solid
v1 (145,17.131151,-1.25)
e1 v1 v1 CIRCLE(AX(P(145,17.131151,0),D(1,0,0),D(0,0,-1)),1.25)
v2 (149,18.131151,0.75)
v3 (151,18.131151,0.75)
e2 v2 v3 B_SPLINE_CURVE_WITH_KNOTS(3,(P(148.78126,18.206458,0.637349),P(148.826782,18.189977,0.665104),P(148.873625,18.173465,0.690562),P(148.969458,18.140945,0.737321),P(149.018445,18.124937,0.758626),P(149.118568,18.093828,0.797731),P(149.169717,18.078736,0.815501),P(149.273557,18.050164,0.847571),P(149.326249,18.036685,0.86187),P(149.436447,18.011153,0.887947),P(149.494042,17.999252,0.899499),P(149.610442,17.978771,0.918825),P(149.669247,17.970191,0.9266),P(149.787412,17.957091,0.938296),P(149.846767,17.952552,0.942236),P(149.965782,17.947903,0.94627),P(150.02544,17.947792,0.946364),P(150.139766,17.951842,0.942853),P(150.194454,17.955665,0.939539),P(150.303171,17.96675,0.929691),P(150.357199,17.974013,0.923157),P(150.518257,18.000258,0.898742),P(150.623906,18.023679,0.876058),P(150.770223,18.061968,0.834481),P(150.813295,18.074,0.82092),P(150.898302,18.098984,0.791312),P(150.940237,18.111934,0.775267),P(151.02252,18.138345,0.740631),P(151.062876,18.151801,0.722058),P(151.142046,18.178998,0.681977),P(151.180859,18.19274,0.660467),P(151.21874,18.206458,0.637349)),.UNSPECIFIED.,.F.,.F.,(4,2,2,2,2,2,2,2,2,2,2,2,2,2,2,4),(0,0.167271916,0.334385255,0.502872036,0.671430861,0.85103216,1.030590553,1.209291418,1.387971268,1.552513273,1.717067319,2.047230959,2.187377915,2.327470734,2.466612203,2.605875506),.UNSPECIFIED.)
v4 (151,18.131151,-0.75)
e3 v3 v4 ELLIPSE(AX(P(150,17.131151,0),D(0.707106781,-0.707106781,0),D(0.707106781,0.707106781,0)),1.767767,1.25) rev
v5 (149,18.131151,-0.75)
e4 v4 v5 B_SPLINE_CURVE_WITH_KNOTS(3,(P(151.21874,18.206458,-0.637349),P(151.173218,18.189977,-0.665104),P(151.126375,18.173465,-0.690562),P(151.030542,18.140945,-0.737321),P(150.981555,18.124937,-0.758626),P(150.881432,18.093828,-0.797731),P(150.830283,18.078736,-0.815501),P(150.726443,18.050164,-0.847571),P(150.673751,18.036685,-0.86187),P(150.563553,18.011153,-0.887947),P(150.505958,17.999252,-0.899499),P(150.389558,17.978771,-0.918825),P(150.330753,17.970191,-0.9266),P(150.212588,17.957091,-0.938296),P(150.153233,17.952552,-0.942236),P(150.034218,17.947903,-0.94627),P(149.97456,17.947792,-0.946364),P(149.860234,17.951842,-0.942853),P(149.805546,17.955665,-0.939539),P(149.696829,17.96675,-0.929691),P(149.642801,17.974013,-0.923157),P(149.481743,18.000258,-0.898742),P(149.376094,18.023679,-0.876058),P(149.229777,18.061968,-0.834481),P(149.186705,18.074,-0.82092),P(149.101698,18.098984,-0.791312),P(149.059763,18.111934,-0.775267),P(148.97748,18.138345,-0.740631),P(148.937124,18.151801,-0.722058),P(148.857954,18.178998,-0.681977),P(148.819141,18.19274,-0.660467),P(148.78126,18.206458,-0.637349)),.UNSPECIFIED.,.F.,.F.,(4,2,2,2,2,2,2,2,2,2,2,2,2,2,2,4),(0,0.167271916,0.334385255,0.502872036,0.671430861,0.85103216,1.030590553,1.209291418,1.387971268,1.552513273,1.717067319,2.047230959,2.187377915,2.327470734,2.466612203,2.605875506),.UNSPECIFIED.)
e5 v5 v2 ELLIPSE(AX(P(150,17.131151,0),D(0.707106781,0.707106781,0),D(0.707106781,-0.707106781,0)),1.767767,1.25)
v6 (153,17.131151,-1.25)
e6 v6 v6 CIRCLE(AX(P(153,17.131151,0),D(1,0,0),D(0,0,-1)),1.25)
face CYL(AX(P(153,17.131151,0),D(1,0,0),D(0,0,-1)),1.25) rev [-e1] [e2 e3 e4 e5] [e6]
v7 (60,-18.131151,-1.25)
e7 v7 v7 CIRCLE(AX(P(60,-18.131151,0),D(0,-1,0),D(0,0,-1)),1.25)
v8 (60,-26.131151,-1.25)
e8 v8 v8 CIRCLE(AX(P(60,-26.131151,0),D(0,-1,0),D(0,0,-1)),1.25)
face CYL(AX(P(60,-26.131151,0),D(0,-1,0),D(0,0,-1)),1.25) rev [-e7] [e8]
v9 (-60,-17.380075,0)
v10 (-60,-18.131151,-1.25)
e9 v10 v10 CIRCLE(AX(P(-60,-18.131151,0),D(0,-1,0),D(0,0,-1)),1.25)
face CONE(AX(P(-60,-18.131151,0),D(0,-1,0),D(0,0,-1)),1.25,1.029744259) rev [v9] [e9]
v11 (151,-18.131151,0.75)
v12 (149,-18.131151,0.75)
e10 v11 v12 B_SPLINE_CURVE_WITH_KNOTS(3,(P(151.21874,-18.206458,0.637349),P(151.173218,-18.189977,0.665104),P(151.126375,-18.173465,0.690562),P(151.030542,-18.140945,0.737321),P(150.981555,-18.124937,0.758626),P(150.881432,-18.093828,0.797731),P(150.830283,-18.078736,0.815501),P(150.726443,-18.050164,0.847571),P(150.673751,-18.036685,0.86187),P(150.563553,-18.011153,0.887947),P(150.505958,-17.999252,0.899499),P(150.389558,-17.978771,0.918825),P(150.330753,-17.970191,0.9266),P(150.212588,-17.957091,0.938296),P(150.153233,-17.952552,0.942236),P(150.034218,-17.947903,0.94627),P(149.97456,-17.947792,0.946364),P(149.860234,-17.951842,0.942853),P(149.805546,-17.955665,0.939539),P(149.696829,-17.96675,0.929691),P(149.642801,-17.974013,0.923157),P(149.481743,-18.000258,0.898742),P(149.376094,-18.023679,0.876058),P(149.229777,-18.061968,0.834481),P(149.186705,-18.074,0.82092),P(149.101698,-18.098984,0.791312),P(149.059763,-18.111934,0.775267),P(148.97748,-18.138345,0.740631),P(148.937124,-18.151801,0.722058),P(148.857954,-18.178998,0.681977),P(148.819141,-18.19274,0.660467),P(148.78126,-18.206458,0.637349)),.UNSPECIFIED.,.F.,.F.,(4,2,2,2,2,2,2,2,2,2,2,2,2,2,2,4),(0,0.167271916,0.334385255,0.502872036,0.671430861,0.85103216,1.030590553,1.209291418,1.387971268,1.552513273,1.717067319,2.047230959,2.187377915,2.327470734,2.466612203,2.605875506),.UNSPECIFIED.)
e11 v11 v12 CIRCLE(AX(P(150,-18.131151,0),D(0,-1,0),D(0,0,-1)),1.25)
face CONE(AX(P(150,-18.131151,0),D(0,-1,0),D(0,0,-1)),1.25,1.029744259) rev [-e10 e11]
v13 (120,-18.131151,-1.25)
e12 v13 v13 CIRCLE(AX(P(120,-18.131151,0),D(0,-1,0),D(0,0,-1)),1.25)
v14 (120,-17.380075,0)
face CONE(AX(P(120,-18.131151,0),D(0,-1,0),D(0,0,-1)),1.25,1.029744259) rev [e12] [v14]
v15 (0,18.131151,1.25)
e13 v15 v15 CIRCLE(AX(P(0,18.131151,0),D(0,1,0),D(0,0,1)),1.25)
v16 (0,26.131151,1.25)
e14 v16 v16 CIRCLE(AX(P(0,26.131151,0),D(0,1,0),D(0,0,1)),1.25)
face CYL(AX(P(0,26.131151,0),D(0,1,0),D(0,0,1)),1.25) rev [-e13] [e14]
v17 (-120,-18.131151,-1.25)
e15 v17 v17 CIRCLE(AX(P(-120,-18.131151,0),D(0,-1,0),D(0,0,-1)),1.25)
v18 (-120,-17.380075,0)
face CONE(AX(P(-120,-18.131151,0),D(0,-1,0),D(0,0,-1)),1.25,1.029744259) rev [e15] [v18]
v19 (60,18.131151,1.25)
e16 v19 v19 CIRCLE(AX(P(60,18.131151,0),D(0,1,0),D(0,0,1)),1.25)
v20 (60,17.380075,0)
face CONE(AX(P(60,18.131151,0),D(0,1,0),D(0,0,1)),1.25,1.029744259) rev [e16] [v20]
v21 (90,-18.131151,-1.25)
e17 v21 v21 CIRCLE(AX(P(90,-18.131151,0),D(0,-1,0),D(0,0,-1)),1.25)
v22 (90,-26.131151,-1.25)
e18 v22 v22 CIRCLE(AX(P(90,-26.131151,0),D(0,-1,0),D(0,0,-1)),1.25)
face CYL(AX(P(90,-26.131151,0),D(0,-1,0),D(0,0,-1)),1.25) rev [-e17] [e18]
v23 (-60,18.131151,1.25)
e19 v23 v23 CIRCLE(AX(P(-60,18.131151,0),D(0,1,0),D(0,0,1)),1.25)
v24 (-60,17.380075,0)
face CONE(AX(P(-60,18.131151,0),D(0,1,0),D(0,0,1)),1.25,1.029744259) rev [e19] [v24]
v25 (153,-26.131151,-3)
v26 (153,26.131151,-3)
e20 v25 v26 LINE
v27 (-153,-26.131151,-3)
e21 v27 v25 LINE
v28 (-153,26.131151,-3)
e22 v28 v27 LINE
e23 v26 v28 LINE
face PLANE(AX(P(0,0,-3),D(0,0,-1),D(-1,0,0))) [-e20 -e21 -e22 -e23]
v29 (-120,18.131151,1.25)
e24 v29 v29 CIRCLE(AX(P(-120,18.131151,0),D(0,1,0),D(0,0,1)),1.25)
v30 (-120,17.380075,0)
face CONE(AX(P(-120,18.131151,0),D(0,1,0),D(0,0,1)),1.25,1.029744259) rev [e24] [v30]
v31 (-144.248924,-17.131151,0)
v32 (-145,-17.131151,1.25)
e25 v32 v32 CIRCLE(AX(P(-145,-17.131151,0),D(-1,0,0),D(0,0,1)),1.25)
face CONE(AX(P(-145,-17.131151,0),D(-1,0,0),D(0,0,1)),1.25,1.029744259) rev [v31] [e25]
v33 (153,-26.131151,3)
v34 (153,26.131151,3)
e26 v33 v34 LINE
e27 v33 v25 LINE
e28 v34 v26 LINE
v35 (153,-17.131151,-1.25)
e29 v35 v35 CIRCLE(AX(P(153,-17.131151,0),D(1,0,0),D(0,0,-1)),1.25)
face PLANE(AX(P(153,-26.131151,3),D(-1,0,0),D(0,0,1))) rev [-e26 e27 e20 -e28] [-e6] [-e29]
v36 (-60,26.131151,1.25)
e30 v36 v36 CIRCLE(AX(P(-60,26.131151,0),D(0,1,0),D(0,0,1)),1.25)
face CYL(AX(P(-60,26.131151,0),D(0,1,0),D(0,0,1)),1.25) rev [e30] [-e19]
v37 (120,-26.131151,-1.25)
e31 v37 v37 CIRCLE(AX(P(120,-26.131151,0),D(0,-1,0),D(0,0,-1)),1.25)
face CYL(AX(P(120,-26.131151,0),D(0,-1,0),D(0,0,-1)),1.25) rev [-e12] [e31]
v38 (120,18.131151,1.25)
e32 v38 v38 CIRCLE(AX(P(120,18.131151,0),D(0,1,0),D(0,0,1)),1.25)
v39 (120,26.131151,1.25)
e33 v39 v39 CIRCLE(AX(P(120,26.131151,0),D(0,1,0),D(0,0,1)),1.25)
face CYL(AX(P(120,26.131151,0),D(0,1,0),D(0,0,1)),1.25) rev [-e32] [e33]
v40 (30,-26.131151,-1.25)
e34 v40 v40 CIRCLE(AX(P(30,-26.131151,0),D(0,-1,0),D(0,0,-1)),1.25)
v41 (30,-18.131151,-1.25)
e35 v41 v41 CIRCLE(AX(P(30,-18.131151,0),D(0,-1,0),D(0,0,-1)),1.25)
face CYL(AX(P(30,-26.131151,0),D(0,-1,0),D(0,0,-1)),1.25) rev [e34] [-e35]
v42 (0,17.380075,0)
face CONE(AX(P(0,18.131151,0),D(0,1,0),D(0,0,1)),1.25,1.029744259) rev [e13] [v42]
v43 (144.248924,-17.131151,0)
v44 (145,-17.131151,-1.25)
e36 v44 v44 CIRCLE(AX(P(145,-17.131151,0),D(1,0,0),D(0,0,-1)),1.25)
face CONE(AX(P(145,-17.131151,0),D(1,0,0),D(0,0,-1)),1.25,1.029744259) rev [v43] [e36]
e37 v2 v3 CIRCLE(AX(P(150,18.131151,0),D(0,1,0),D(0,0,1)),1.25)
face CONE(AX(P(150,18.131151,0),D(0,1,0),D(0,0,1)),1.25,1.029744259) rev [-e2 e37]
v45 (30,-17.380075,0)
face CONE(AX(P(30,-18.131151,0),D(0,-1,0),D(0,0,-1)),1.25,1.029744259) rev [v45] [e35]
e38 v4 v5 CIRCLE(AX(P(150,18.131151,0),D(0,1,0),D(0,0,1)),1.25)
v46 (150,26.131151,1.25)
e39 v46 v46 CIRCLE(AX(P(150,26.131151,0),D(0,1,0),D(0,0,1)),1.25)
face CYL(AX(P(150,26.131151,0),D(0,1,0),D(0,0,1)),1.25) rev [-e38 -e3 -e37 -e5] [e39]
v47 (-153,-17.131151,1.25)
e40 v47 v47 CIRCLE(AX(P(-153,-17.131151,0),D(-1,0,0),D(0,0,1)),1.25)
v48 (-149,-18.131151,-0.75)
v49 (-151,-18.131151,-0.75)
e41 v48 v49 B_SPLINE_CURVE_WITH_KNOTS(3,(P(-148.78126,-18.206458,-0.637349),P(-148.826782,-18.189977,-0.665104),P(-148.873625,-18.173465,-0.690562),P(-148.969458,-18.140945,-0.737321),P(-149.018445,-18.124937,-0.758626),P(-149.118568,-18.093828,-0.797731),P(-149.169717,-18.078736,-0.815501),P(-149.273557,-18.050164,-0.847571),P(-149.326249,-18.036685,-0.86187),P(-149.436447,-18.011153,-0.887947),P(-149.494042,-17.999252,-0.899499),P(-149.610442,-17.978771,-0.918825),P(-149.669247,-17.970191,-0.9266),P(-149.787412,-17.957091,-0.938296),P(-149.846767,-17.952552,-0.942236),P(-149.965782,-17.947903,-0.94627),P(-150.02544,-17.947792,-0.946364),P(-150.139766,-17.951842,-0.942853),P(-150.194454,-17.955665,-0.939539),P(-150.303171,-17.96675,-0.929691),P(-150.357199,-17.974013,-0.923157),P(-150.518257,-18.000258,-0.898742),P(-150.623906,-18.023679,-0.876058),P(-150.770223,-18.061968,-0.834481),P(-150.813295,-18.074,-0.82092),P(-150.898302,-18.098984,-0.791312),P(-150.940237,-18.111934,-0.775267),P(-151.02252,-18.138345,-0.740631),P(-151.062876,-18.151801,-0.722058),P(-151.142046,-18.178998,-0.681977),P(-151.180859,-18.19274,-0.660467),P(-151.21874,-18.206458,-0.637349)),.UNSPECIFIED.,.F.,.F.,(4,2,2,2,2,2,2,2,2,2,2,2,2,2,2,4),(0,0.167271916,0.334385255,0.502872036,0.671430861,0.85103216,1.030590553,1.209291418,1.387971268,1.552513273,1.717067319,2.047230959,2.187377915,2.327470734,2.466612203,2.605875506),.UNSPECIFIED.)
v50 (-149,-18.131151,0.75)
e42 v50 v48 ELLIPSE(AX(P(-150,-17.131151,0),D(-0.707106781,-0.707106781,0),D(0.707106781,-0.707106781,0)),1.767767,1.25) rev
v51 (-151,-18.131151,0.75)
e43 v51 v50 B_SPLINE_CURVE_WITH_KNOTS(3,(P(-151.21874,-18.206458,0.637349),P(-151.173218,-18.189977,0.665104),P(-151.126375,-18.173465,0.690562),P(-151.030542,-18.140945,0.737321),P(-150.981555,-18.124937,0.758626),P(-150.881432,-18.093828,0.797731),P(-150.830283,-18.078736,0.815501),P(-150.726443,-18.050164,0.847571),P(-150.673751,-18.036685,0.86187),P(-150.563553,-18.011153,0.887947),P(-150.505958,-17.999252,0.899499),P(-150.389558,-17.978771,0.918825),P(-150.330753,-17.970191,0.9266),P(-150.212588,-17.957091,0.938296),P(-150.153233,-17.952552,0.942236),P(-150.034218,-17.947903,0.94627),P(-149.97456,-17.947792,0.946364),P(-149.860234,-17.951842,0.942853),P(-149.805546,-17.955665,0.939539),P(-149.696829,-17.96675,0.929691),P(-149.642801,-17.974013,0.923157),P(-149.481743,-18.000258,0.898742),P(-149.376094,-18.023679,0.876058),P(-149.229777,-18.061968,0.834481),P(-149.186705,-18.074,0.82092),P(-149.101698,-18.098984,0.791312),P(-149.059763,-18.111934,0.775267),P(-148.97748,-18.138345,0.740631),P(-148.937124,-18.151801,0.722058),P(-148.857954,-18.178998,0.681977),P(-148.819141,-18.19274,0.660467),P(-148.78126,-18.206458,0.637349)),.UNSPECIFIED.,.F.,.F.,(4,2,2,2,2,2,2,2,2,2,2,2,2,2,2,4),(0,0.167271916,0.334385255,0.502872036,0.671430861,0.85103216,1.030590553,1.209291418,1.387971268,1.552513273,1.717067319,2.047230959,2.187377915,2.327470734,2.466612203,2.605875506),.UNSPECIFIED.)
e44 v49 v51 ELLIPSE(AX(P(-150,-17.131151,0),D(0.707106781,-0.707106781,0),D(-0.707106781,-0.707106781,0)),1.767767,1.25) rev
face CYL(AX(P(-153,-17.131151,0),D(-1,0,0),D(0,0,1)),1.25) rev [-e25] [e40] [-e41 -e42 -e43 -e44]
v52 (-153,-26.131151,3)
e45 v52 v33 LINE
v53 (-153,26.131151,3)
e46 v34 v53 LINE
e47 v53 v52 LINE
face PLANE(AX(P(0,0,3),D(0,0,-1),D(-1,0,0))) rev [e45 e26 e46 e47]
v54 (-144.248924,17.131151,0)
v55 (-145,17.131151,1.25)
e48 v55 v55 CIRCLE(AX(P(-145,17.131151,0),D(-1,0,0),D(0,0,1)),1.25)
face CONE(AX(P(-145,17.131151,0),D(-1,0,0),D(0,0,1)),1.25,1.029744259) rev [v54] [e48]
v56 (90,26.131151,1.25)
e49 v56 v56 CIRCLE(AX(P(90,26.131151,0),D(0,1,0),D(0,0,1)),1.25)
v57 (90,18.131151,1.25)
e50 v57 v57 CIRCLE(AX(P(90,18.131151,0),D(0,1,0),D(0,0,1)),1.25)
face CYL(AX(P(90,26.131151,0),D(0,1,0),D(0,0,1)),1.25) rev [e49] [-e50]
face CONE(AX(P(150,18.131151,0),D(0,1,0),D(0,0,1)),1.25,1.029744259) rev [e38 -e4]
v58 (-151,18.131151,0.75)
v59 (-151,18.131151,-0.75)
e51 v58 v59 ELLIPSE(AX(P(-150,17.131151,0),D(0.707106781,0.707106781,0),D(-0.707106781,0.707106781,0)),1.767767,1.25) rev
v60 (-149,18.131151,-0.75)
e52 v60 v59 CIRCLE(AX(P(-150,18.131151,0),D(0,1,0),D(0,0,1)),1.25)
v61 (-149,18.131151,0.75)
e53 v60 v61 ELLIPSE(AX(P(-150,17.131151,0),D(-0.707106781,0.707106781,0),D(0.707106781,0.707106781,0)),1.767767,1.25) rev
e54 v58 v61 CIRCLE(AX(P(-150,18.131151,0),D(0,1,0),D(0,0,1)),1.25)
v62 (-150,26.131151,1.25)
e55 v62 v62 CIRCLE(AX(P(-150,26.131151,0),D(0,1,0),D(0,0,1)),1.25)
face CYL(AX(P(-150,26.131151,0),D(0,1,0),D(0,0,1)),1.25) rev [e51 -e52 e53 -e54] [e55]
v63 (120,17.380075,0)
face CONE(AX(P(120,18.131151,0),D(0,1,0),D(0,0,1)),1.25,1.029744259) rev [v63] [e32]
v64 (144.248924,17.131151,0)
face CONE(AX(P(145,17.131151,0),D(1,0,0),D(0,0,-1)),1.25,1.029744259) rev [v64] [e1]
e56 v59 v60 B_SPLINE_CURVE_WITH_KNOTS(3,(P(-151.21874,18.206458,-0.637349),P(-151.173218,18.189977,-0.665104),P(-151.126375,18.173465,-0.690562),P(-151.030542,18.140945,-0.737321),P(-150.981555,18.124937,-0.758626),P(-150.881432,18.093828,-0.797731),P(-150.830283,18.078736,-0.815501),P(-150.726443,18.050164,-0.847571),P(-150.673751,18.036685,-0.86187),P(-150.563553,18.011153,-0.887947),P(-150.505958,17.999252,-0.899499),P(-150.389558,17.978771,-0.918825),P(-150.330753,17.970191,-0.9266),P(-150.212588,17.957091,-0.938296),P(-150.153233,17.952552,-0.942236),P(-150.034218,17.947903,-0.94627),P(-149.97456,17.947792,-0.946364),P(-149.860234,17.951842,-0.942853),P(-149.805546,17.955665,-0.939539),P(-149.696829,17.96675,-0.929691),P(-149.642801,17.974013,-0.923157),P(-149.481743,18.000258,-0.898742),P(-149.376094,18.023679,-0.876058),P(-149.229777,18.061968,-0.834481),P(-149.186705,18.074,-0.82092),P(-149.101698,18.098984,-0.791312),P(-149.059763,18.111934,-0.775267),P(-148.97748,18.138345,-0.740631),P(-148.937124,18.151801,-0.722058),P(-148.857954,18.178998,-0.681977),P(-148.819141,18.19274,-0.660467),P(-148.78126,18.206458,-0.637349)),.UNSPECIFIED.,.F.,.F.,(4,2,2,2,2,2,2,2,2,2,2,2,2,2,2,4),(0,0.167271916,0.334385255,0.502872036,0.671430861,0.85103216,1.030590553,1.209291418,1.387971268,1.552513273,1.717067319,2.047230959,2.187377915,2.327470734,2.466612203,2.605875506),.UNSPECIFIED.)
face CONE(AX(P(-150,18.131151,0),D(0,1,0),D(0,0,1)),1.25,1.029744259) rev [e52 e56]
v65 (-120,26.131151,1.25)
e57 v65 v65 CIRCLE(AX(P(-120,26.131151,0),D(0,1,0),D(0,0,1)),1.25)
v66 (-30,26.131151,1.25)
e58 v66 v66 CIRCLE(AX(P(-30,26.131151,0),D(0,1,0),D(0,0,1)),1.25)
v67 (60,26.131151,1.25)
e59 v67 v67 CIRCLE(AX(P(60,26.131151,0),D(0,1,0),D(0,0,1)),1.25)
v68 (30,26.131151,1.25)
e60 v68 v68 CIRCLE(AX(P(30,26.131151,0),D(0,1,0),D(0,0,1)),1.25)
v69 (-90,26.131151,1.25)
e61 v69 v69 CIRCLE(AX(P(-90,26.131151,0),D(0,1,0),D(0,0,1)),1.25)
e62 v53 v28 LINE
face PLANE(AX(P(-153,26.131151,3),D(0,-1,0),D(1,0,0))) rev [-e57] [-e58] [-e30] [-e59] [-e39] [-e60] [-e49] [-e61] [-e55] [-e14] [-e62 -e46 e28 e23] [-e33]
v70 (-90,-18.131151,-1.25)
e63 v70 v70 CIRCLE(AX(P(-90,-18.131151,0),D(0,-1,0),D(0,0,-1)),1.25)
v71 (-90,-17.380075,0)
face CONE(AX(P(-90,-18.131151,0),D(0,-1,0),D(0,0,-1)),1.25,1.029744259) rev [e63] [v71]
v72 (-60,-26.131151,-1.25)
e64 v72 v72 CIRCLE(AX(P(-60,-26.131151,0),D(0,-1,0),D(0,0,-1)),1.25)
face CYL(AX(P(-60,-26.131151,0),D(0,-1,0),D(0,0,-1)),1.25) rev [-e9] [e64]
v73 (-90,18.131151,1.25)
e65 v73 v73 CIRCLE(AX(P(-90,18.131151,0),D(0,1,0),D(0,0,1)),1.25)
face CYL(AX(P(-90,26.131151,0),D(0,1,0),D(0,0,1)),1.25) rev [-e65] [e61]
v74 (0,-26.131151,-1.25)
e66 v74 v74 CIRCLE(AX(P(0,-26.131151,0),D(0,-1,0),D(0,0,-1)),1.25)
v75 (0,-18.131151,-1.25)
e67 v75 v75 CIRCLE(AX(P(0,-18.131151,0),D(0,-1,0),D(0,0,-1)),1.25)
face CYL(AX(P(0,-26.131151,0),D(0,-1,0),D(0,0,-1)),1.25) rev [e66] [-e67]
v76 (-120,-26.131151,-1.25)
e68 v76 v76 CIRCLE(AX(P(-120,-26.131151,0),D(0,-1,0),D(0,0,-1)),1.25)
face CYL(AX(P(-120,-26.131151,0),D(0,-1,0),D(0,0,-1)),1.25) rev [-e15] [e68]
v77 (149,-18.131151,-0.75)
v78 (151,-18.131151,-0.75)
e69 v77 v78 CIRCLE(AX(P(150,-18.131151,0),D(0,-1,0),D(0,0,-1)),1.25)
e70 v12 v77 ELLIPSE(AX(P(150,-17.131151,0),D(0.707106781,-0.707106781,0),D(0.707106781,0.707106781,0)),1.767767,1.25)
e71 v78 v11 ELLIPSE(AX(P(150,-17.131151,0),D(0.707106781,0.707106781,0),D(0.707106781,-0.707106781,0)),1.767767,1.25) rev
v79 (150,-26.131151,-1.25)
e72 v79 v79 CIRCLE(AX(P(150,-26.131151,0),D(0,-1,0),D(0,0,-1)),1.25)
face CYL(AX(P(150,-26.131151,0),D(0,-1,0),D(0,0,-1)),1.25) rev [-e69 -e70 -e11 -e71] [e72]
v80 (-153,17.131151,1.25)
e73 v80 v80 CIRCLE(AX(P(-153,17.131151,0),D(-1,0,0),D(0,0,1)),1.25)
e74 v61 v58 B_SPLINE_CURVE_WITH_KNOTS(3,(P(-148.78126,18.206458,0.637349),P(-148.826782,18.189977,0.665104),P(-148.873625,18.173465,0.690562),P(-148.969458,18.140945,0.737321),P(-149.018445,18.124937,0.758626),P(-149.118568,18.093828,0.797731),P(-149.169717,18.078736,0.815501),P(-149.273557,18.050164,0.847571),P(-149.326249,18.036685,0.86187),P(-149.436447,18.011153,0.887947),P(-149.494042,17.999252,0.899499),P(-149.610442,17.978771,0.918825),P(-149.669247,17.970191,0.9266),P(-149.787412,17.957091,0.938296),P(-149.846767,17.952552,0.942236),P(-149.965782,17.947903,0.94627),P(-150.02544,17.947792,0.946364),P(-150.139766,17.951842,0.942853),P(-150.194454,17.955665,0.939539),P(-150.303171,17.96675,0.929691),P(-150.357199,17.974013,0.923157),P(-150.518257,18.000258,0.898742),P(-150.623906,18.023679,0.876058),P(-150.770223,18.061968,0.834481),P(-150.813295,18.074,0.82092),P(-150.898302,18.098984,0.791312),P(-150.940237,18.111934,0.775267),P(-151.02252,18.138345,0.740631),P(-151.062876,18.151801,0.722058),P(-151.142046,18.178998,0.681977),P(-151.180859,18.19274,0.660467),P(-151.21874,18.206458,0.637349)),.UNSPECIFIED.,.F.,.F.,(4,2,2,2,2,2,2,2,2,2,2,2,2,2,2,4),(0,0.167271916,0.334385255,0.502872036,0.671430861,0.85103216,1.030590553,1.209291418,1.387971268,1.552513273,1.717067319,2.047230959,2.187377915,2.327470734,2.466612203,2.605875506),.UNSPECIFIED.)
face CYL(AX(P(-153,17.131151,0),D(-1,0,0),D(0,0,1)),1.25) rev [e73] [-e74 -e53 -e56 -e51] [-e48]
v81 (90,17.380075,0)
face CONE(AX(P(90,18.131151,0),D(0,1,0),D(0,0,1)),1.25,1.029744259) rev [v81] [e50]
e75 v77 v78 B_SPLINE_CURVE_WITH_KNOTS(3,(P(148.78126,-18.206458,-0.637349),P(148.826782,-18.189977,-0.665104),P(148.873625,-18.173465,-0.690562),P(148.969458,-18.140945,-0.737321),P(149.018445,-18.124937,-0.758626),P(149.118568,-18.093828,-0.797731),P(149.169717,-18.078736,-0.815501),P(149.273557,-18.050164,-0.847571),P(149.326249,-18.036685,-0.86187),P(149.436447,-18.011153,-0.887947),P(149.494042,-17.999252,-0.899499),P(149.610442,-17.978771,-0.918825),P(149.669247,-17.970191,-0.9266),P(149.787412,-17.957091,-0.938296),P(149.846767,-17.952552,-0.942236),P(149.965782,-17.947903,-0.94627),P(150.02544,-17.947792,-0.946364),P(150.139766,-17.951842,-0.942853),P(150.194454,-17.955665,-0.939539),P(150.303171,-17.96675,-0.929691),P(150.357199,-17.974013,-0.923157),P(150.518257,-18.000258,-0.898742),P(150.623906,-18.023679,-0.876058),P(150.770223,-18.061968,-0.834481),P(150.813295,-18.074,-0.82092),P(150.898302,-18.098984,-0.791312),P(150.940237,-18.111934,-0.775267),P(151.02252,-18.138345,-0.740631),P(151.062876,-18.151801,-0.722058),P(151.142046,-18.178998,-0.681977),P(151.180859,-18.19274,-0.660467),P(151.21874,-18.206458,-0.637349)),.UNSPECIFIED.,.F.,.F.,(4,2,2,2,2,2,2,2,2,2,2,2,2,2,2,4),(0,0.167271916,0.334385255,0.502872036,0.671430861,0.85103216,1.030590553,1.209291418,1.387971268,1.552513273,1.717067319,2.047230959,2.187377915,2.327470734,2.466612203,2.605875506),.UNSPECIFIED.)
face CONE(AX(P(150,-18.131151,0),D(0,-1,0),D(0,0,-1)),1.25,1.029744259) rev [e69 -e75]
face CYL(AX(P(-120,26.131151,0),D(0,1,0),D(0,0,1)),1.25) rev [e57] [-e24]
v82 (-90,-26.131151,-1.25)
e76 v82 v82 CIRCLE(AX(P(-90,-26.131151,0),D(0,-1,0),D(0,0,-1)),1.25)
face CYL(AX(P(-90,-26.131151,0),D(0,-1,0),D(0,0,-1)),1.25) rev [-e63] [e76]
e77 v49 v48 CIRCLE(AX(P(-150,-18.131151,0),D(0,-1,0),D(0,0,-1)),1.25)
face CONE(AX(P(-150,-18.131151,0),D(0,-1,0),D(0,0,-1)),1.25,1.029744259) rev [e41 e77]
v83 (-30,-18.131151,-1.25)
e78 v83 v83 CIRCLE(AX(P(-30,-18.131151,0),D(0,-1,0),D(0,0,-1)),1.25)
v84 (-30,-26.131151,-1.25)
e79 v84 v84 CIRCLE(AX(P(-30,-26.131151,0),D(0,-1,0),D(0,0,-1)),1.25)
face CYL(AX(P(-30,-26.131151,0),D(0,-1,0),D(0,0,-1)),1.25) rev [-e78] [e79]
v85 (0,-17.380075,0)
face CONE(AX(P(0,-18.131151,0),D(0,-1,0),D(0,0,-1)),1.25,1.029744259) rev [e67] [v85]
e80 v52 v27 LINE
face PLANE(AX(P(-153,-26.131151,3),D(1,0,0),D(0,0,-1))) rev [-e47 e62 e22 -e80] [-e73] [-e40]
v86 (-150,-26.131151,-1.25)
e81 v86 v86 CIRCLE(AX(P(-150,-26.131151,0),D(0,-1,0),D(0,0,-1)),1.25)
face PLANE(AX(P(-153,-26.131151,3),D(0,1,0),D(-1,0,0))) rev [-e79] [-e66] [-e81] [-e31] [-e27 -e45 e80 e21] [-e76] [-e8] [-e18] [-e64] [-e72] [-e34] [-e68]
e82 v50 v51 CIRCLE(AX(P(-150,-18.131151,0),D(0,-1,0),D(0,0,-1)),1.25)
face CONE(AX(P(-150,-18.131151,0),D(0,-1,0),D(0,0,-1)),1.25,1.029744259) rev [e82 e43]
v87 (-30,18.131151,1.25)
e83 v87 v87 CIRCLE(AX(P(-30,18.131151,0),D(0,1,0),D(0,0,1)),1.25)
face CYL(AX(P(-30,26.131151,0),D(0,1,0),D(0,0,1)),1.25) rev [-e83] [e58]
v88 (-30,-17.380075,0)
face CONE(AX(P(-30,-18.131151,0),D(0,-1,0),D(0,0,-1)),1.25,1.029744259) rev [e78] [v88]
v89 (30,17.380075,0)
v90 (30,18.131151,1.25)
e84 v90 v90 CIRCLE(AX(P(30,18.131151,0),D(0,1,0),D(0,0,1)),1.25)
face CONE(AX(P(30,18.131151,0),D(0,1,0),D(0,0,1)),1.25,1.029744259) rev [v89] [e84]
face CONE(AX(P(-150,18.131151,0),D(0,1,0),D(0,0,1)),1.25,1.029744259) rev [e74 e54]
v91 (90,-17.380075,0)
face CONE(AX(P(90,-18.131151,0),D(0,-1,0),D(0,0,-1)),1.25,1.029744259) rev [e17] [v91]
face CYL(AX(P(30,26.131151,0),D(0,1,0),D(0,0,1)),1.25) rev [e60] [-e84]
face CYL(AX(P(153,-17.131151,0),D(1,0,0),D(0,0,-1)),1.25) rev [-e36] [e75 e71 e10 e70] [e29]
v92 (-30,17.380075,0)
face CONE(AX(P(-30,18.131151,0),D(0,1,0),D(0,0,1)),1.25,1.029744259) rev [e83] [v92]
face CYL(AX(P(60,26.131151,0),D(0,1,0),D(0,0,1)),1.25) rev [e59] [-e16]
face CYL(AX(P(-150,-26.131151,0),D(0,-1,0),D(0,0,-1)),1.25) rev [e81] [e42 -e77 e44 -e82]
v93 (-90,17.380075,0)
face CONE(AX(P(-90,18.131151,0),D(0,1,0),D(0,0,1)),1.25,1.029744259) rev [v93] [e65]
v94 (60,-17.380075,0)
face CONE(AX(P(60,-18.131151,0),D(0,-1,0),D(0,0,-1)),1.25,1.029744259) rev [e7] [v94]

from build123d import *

# Parameters (mm, degrees)
SKETCH_2_W               = 306
SKETCH_2_H               = 52.262301256
EXTRUDE_1_DEPTH          = 3
M3X0_5_2_D               = 2.5
M3X0_5_2_DEPTH           = 8
M3X0_5_2_TIP             = 0.751075774
M3X0_5_2_ON_FACE_2_D     = 2.5
M3X0_5_2_ON_FACE_2_DEPTH = 8
M3X0_5_2_ON_FACE_2_TIP   = 0.751075774
PATTERN_LINEAR_1_COUNT   = 11
PATTERN_LINEAR_1_PITCH   = 30


# Read off the part's stored shape, not the designer's step: M3x0.5 ねじ穴用ねじ下穴ﾄﾞﾘﾙ1
with BuildPart() as part:
    # ｽｹｯﾁ2 → ﾎﾞｽ - 押し出し1 (new, symmetric)
    with BuildSketch(Plane.XY):
        Rectangle(SKETCH_2_W, SKETCH_2_H)
    extrude(amount=EXTRUDE_1_DEPTH, both=True)

    # M3x0.5 ねじ穴用ねじ下穴ﾄﾞﾘﾙ1 outline → M3x0.5 ねじ穴用ねじ下穴ﾄﾞﾘﾙ1 (revolve, cut)
    with BuildSketch(Plane(origin=(-150, 0, 0), x_dir=(1, 0, 0), z_dir=(0, 0, 1))):
        Polygon((1.25, -18.131150628), (0, -17.380074854), (0, -26.131150628), (1.25, -26.131150628), align=None)
        Polygon((0, 26.131150628), (0, 17.380074854), (1.25, 18.131150628), (1.25, 26.131150628), align=None)
    m3x0_5_1 = revolve(axis=Axis((-150, 0, 0), (0, 1, 0)), mode=Mode.SUBTRACT)

    # M3x0.5 ねじ穴用ねじ下穴ﾄﾞﾘﾙ2
    with Locations(Plane(origin=(-153, 17.131150628, 0), x_dir=(0, 0, -1), z_dir=(-1, 0, 0))):
        with Locations((0, 0), (0, 34.262301256)):
            Hole(M3X0_5_2_D / 2, depth=M3X0_5_2_DEPTH)
            with Locations((0, 0, -(M3X0_5_2_DEPTH + M3X0_5_2_TIP / 2))):  # 118° drill point
                Cone(0, M3X0_5_2_D / 2, M3X0_5_2_TIP, mode=Mode.SUBTRACT)

    # M3x0.5 ねじ穴用ねじ下穴ﾄﾞﾘﾙ2 on face 2
    with Locations(Plane(origin=(153, 17.131150628, 0), x_dir=(0, 0, 1), z_dir=(1, 0, 0))):
        with Locations((0, 0), (0, 34.262301256)):
            Hole(M3X0_5_2_ON_FACE_2_D / 2, depth=M3X0_5_2_ON_FACE_2_DEPTH)
            with Locations((0, 0, -(M3X0_5_2_ON_FACE_2_DEPTH + M3X0_5_2_ON_FACE_2_TIP / 2))):  # 118° drill point
                Cone(0, M3X0_5_2_ON_FACE_2_D / 2, M3X0_5_2_ON_FACE_2_TIP, mode=Mode.SUBTRACT)

    # 直線ﾊﾟﾀｰﾝ1: M3x0.5 ねじ穴用ねじ下穴ﾄﾞﾘﾙ1 ×11
    with Locations(*[(i * PATTERN_LINEAR_1_PITCH, 0, 0) for i in range(1, PATTERN_LINEAR_1_COUNT)]):
        add(m3x0_5_1, mode=Mode.SUBTRACT)


solid = part.part
